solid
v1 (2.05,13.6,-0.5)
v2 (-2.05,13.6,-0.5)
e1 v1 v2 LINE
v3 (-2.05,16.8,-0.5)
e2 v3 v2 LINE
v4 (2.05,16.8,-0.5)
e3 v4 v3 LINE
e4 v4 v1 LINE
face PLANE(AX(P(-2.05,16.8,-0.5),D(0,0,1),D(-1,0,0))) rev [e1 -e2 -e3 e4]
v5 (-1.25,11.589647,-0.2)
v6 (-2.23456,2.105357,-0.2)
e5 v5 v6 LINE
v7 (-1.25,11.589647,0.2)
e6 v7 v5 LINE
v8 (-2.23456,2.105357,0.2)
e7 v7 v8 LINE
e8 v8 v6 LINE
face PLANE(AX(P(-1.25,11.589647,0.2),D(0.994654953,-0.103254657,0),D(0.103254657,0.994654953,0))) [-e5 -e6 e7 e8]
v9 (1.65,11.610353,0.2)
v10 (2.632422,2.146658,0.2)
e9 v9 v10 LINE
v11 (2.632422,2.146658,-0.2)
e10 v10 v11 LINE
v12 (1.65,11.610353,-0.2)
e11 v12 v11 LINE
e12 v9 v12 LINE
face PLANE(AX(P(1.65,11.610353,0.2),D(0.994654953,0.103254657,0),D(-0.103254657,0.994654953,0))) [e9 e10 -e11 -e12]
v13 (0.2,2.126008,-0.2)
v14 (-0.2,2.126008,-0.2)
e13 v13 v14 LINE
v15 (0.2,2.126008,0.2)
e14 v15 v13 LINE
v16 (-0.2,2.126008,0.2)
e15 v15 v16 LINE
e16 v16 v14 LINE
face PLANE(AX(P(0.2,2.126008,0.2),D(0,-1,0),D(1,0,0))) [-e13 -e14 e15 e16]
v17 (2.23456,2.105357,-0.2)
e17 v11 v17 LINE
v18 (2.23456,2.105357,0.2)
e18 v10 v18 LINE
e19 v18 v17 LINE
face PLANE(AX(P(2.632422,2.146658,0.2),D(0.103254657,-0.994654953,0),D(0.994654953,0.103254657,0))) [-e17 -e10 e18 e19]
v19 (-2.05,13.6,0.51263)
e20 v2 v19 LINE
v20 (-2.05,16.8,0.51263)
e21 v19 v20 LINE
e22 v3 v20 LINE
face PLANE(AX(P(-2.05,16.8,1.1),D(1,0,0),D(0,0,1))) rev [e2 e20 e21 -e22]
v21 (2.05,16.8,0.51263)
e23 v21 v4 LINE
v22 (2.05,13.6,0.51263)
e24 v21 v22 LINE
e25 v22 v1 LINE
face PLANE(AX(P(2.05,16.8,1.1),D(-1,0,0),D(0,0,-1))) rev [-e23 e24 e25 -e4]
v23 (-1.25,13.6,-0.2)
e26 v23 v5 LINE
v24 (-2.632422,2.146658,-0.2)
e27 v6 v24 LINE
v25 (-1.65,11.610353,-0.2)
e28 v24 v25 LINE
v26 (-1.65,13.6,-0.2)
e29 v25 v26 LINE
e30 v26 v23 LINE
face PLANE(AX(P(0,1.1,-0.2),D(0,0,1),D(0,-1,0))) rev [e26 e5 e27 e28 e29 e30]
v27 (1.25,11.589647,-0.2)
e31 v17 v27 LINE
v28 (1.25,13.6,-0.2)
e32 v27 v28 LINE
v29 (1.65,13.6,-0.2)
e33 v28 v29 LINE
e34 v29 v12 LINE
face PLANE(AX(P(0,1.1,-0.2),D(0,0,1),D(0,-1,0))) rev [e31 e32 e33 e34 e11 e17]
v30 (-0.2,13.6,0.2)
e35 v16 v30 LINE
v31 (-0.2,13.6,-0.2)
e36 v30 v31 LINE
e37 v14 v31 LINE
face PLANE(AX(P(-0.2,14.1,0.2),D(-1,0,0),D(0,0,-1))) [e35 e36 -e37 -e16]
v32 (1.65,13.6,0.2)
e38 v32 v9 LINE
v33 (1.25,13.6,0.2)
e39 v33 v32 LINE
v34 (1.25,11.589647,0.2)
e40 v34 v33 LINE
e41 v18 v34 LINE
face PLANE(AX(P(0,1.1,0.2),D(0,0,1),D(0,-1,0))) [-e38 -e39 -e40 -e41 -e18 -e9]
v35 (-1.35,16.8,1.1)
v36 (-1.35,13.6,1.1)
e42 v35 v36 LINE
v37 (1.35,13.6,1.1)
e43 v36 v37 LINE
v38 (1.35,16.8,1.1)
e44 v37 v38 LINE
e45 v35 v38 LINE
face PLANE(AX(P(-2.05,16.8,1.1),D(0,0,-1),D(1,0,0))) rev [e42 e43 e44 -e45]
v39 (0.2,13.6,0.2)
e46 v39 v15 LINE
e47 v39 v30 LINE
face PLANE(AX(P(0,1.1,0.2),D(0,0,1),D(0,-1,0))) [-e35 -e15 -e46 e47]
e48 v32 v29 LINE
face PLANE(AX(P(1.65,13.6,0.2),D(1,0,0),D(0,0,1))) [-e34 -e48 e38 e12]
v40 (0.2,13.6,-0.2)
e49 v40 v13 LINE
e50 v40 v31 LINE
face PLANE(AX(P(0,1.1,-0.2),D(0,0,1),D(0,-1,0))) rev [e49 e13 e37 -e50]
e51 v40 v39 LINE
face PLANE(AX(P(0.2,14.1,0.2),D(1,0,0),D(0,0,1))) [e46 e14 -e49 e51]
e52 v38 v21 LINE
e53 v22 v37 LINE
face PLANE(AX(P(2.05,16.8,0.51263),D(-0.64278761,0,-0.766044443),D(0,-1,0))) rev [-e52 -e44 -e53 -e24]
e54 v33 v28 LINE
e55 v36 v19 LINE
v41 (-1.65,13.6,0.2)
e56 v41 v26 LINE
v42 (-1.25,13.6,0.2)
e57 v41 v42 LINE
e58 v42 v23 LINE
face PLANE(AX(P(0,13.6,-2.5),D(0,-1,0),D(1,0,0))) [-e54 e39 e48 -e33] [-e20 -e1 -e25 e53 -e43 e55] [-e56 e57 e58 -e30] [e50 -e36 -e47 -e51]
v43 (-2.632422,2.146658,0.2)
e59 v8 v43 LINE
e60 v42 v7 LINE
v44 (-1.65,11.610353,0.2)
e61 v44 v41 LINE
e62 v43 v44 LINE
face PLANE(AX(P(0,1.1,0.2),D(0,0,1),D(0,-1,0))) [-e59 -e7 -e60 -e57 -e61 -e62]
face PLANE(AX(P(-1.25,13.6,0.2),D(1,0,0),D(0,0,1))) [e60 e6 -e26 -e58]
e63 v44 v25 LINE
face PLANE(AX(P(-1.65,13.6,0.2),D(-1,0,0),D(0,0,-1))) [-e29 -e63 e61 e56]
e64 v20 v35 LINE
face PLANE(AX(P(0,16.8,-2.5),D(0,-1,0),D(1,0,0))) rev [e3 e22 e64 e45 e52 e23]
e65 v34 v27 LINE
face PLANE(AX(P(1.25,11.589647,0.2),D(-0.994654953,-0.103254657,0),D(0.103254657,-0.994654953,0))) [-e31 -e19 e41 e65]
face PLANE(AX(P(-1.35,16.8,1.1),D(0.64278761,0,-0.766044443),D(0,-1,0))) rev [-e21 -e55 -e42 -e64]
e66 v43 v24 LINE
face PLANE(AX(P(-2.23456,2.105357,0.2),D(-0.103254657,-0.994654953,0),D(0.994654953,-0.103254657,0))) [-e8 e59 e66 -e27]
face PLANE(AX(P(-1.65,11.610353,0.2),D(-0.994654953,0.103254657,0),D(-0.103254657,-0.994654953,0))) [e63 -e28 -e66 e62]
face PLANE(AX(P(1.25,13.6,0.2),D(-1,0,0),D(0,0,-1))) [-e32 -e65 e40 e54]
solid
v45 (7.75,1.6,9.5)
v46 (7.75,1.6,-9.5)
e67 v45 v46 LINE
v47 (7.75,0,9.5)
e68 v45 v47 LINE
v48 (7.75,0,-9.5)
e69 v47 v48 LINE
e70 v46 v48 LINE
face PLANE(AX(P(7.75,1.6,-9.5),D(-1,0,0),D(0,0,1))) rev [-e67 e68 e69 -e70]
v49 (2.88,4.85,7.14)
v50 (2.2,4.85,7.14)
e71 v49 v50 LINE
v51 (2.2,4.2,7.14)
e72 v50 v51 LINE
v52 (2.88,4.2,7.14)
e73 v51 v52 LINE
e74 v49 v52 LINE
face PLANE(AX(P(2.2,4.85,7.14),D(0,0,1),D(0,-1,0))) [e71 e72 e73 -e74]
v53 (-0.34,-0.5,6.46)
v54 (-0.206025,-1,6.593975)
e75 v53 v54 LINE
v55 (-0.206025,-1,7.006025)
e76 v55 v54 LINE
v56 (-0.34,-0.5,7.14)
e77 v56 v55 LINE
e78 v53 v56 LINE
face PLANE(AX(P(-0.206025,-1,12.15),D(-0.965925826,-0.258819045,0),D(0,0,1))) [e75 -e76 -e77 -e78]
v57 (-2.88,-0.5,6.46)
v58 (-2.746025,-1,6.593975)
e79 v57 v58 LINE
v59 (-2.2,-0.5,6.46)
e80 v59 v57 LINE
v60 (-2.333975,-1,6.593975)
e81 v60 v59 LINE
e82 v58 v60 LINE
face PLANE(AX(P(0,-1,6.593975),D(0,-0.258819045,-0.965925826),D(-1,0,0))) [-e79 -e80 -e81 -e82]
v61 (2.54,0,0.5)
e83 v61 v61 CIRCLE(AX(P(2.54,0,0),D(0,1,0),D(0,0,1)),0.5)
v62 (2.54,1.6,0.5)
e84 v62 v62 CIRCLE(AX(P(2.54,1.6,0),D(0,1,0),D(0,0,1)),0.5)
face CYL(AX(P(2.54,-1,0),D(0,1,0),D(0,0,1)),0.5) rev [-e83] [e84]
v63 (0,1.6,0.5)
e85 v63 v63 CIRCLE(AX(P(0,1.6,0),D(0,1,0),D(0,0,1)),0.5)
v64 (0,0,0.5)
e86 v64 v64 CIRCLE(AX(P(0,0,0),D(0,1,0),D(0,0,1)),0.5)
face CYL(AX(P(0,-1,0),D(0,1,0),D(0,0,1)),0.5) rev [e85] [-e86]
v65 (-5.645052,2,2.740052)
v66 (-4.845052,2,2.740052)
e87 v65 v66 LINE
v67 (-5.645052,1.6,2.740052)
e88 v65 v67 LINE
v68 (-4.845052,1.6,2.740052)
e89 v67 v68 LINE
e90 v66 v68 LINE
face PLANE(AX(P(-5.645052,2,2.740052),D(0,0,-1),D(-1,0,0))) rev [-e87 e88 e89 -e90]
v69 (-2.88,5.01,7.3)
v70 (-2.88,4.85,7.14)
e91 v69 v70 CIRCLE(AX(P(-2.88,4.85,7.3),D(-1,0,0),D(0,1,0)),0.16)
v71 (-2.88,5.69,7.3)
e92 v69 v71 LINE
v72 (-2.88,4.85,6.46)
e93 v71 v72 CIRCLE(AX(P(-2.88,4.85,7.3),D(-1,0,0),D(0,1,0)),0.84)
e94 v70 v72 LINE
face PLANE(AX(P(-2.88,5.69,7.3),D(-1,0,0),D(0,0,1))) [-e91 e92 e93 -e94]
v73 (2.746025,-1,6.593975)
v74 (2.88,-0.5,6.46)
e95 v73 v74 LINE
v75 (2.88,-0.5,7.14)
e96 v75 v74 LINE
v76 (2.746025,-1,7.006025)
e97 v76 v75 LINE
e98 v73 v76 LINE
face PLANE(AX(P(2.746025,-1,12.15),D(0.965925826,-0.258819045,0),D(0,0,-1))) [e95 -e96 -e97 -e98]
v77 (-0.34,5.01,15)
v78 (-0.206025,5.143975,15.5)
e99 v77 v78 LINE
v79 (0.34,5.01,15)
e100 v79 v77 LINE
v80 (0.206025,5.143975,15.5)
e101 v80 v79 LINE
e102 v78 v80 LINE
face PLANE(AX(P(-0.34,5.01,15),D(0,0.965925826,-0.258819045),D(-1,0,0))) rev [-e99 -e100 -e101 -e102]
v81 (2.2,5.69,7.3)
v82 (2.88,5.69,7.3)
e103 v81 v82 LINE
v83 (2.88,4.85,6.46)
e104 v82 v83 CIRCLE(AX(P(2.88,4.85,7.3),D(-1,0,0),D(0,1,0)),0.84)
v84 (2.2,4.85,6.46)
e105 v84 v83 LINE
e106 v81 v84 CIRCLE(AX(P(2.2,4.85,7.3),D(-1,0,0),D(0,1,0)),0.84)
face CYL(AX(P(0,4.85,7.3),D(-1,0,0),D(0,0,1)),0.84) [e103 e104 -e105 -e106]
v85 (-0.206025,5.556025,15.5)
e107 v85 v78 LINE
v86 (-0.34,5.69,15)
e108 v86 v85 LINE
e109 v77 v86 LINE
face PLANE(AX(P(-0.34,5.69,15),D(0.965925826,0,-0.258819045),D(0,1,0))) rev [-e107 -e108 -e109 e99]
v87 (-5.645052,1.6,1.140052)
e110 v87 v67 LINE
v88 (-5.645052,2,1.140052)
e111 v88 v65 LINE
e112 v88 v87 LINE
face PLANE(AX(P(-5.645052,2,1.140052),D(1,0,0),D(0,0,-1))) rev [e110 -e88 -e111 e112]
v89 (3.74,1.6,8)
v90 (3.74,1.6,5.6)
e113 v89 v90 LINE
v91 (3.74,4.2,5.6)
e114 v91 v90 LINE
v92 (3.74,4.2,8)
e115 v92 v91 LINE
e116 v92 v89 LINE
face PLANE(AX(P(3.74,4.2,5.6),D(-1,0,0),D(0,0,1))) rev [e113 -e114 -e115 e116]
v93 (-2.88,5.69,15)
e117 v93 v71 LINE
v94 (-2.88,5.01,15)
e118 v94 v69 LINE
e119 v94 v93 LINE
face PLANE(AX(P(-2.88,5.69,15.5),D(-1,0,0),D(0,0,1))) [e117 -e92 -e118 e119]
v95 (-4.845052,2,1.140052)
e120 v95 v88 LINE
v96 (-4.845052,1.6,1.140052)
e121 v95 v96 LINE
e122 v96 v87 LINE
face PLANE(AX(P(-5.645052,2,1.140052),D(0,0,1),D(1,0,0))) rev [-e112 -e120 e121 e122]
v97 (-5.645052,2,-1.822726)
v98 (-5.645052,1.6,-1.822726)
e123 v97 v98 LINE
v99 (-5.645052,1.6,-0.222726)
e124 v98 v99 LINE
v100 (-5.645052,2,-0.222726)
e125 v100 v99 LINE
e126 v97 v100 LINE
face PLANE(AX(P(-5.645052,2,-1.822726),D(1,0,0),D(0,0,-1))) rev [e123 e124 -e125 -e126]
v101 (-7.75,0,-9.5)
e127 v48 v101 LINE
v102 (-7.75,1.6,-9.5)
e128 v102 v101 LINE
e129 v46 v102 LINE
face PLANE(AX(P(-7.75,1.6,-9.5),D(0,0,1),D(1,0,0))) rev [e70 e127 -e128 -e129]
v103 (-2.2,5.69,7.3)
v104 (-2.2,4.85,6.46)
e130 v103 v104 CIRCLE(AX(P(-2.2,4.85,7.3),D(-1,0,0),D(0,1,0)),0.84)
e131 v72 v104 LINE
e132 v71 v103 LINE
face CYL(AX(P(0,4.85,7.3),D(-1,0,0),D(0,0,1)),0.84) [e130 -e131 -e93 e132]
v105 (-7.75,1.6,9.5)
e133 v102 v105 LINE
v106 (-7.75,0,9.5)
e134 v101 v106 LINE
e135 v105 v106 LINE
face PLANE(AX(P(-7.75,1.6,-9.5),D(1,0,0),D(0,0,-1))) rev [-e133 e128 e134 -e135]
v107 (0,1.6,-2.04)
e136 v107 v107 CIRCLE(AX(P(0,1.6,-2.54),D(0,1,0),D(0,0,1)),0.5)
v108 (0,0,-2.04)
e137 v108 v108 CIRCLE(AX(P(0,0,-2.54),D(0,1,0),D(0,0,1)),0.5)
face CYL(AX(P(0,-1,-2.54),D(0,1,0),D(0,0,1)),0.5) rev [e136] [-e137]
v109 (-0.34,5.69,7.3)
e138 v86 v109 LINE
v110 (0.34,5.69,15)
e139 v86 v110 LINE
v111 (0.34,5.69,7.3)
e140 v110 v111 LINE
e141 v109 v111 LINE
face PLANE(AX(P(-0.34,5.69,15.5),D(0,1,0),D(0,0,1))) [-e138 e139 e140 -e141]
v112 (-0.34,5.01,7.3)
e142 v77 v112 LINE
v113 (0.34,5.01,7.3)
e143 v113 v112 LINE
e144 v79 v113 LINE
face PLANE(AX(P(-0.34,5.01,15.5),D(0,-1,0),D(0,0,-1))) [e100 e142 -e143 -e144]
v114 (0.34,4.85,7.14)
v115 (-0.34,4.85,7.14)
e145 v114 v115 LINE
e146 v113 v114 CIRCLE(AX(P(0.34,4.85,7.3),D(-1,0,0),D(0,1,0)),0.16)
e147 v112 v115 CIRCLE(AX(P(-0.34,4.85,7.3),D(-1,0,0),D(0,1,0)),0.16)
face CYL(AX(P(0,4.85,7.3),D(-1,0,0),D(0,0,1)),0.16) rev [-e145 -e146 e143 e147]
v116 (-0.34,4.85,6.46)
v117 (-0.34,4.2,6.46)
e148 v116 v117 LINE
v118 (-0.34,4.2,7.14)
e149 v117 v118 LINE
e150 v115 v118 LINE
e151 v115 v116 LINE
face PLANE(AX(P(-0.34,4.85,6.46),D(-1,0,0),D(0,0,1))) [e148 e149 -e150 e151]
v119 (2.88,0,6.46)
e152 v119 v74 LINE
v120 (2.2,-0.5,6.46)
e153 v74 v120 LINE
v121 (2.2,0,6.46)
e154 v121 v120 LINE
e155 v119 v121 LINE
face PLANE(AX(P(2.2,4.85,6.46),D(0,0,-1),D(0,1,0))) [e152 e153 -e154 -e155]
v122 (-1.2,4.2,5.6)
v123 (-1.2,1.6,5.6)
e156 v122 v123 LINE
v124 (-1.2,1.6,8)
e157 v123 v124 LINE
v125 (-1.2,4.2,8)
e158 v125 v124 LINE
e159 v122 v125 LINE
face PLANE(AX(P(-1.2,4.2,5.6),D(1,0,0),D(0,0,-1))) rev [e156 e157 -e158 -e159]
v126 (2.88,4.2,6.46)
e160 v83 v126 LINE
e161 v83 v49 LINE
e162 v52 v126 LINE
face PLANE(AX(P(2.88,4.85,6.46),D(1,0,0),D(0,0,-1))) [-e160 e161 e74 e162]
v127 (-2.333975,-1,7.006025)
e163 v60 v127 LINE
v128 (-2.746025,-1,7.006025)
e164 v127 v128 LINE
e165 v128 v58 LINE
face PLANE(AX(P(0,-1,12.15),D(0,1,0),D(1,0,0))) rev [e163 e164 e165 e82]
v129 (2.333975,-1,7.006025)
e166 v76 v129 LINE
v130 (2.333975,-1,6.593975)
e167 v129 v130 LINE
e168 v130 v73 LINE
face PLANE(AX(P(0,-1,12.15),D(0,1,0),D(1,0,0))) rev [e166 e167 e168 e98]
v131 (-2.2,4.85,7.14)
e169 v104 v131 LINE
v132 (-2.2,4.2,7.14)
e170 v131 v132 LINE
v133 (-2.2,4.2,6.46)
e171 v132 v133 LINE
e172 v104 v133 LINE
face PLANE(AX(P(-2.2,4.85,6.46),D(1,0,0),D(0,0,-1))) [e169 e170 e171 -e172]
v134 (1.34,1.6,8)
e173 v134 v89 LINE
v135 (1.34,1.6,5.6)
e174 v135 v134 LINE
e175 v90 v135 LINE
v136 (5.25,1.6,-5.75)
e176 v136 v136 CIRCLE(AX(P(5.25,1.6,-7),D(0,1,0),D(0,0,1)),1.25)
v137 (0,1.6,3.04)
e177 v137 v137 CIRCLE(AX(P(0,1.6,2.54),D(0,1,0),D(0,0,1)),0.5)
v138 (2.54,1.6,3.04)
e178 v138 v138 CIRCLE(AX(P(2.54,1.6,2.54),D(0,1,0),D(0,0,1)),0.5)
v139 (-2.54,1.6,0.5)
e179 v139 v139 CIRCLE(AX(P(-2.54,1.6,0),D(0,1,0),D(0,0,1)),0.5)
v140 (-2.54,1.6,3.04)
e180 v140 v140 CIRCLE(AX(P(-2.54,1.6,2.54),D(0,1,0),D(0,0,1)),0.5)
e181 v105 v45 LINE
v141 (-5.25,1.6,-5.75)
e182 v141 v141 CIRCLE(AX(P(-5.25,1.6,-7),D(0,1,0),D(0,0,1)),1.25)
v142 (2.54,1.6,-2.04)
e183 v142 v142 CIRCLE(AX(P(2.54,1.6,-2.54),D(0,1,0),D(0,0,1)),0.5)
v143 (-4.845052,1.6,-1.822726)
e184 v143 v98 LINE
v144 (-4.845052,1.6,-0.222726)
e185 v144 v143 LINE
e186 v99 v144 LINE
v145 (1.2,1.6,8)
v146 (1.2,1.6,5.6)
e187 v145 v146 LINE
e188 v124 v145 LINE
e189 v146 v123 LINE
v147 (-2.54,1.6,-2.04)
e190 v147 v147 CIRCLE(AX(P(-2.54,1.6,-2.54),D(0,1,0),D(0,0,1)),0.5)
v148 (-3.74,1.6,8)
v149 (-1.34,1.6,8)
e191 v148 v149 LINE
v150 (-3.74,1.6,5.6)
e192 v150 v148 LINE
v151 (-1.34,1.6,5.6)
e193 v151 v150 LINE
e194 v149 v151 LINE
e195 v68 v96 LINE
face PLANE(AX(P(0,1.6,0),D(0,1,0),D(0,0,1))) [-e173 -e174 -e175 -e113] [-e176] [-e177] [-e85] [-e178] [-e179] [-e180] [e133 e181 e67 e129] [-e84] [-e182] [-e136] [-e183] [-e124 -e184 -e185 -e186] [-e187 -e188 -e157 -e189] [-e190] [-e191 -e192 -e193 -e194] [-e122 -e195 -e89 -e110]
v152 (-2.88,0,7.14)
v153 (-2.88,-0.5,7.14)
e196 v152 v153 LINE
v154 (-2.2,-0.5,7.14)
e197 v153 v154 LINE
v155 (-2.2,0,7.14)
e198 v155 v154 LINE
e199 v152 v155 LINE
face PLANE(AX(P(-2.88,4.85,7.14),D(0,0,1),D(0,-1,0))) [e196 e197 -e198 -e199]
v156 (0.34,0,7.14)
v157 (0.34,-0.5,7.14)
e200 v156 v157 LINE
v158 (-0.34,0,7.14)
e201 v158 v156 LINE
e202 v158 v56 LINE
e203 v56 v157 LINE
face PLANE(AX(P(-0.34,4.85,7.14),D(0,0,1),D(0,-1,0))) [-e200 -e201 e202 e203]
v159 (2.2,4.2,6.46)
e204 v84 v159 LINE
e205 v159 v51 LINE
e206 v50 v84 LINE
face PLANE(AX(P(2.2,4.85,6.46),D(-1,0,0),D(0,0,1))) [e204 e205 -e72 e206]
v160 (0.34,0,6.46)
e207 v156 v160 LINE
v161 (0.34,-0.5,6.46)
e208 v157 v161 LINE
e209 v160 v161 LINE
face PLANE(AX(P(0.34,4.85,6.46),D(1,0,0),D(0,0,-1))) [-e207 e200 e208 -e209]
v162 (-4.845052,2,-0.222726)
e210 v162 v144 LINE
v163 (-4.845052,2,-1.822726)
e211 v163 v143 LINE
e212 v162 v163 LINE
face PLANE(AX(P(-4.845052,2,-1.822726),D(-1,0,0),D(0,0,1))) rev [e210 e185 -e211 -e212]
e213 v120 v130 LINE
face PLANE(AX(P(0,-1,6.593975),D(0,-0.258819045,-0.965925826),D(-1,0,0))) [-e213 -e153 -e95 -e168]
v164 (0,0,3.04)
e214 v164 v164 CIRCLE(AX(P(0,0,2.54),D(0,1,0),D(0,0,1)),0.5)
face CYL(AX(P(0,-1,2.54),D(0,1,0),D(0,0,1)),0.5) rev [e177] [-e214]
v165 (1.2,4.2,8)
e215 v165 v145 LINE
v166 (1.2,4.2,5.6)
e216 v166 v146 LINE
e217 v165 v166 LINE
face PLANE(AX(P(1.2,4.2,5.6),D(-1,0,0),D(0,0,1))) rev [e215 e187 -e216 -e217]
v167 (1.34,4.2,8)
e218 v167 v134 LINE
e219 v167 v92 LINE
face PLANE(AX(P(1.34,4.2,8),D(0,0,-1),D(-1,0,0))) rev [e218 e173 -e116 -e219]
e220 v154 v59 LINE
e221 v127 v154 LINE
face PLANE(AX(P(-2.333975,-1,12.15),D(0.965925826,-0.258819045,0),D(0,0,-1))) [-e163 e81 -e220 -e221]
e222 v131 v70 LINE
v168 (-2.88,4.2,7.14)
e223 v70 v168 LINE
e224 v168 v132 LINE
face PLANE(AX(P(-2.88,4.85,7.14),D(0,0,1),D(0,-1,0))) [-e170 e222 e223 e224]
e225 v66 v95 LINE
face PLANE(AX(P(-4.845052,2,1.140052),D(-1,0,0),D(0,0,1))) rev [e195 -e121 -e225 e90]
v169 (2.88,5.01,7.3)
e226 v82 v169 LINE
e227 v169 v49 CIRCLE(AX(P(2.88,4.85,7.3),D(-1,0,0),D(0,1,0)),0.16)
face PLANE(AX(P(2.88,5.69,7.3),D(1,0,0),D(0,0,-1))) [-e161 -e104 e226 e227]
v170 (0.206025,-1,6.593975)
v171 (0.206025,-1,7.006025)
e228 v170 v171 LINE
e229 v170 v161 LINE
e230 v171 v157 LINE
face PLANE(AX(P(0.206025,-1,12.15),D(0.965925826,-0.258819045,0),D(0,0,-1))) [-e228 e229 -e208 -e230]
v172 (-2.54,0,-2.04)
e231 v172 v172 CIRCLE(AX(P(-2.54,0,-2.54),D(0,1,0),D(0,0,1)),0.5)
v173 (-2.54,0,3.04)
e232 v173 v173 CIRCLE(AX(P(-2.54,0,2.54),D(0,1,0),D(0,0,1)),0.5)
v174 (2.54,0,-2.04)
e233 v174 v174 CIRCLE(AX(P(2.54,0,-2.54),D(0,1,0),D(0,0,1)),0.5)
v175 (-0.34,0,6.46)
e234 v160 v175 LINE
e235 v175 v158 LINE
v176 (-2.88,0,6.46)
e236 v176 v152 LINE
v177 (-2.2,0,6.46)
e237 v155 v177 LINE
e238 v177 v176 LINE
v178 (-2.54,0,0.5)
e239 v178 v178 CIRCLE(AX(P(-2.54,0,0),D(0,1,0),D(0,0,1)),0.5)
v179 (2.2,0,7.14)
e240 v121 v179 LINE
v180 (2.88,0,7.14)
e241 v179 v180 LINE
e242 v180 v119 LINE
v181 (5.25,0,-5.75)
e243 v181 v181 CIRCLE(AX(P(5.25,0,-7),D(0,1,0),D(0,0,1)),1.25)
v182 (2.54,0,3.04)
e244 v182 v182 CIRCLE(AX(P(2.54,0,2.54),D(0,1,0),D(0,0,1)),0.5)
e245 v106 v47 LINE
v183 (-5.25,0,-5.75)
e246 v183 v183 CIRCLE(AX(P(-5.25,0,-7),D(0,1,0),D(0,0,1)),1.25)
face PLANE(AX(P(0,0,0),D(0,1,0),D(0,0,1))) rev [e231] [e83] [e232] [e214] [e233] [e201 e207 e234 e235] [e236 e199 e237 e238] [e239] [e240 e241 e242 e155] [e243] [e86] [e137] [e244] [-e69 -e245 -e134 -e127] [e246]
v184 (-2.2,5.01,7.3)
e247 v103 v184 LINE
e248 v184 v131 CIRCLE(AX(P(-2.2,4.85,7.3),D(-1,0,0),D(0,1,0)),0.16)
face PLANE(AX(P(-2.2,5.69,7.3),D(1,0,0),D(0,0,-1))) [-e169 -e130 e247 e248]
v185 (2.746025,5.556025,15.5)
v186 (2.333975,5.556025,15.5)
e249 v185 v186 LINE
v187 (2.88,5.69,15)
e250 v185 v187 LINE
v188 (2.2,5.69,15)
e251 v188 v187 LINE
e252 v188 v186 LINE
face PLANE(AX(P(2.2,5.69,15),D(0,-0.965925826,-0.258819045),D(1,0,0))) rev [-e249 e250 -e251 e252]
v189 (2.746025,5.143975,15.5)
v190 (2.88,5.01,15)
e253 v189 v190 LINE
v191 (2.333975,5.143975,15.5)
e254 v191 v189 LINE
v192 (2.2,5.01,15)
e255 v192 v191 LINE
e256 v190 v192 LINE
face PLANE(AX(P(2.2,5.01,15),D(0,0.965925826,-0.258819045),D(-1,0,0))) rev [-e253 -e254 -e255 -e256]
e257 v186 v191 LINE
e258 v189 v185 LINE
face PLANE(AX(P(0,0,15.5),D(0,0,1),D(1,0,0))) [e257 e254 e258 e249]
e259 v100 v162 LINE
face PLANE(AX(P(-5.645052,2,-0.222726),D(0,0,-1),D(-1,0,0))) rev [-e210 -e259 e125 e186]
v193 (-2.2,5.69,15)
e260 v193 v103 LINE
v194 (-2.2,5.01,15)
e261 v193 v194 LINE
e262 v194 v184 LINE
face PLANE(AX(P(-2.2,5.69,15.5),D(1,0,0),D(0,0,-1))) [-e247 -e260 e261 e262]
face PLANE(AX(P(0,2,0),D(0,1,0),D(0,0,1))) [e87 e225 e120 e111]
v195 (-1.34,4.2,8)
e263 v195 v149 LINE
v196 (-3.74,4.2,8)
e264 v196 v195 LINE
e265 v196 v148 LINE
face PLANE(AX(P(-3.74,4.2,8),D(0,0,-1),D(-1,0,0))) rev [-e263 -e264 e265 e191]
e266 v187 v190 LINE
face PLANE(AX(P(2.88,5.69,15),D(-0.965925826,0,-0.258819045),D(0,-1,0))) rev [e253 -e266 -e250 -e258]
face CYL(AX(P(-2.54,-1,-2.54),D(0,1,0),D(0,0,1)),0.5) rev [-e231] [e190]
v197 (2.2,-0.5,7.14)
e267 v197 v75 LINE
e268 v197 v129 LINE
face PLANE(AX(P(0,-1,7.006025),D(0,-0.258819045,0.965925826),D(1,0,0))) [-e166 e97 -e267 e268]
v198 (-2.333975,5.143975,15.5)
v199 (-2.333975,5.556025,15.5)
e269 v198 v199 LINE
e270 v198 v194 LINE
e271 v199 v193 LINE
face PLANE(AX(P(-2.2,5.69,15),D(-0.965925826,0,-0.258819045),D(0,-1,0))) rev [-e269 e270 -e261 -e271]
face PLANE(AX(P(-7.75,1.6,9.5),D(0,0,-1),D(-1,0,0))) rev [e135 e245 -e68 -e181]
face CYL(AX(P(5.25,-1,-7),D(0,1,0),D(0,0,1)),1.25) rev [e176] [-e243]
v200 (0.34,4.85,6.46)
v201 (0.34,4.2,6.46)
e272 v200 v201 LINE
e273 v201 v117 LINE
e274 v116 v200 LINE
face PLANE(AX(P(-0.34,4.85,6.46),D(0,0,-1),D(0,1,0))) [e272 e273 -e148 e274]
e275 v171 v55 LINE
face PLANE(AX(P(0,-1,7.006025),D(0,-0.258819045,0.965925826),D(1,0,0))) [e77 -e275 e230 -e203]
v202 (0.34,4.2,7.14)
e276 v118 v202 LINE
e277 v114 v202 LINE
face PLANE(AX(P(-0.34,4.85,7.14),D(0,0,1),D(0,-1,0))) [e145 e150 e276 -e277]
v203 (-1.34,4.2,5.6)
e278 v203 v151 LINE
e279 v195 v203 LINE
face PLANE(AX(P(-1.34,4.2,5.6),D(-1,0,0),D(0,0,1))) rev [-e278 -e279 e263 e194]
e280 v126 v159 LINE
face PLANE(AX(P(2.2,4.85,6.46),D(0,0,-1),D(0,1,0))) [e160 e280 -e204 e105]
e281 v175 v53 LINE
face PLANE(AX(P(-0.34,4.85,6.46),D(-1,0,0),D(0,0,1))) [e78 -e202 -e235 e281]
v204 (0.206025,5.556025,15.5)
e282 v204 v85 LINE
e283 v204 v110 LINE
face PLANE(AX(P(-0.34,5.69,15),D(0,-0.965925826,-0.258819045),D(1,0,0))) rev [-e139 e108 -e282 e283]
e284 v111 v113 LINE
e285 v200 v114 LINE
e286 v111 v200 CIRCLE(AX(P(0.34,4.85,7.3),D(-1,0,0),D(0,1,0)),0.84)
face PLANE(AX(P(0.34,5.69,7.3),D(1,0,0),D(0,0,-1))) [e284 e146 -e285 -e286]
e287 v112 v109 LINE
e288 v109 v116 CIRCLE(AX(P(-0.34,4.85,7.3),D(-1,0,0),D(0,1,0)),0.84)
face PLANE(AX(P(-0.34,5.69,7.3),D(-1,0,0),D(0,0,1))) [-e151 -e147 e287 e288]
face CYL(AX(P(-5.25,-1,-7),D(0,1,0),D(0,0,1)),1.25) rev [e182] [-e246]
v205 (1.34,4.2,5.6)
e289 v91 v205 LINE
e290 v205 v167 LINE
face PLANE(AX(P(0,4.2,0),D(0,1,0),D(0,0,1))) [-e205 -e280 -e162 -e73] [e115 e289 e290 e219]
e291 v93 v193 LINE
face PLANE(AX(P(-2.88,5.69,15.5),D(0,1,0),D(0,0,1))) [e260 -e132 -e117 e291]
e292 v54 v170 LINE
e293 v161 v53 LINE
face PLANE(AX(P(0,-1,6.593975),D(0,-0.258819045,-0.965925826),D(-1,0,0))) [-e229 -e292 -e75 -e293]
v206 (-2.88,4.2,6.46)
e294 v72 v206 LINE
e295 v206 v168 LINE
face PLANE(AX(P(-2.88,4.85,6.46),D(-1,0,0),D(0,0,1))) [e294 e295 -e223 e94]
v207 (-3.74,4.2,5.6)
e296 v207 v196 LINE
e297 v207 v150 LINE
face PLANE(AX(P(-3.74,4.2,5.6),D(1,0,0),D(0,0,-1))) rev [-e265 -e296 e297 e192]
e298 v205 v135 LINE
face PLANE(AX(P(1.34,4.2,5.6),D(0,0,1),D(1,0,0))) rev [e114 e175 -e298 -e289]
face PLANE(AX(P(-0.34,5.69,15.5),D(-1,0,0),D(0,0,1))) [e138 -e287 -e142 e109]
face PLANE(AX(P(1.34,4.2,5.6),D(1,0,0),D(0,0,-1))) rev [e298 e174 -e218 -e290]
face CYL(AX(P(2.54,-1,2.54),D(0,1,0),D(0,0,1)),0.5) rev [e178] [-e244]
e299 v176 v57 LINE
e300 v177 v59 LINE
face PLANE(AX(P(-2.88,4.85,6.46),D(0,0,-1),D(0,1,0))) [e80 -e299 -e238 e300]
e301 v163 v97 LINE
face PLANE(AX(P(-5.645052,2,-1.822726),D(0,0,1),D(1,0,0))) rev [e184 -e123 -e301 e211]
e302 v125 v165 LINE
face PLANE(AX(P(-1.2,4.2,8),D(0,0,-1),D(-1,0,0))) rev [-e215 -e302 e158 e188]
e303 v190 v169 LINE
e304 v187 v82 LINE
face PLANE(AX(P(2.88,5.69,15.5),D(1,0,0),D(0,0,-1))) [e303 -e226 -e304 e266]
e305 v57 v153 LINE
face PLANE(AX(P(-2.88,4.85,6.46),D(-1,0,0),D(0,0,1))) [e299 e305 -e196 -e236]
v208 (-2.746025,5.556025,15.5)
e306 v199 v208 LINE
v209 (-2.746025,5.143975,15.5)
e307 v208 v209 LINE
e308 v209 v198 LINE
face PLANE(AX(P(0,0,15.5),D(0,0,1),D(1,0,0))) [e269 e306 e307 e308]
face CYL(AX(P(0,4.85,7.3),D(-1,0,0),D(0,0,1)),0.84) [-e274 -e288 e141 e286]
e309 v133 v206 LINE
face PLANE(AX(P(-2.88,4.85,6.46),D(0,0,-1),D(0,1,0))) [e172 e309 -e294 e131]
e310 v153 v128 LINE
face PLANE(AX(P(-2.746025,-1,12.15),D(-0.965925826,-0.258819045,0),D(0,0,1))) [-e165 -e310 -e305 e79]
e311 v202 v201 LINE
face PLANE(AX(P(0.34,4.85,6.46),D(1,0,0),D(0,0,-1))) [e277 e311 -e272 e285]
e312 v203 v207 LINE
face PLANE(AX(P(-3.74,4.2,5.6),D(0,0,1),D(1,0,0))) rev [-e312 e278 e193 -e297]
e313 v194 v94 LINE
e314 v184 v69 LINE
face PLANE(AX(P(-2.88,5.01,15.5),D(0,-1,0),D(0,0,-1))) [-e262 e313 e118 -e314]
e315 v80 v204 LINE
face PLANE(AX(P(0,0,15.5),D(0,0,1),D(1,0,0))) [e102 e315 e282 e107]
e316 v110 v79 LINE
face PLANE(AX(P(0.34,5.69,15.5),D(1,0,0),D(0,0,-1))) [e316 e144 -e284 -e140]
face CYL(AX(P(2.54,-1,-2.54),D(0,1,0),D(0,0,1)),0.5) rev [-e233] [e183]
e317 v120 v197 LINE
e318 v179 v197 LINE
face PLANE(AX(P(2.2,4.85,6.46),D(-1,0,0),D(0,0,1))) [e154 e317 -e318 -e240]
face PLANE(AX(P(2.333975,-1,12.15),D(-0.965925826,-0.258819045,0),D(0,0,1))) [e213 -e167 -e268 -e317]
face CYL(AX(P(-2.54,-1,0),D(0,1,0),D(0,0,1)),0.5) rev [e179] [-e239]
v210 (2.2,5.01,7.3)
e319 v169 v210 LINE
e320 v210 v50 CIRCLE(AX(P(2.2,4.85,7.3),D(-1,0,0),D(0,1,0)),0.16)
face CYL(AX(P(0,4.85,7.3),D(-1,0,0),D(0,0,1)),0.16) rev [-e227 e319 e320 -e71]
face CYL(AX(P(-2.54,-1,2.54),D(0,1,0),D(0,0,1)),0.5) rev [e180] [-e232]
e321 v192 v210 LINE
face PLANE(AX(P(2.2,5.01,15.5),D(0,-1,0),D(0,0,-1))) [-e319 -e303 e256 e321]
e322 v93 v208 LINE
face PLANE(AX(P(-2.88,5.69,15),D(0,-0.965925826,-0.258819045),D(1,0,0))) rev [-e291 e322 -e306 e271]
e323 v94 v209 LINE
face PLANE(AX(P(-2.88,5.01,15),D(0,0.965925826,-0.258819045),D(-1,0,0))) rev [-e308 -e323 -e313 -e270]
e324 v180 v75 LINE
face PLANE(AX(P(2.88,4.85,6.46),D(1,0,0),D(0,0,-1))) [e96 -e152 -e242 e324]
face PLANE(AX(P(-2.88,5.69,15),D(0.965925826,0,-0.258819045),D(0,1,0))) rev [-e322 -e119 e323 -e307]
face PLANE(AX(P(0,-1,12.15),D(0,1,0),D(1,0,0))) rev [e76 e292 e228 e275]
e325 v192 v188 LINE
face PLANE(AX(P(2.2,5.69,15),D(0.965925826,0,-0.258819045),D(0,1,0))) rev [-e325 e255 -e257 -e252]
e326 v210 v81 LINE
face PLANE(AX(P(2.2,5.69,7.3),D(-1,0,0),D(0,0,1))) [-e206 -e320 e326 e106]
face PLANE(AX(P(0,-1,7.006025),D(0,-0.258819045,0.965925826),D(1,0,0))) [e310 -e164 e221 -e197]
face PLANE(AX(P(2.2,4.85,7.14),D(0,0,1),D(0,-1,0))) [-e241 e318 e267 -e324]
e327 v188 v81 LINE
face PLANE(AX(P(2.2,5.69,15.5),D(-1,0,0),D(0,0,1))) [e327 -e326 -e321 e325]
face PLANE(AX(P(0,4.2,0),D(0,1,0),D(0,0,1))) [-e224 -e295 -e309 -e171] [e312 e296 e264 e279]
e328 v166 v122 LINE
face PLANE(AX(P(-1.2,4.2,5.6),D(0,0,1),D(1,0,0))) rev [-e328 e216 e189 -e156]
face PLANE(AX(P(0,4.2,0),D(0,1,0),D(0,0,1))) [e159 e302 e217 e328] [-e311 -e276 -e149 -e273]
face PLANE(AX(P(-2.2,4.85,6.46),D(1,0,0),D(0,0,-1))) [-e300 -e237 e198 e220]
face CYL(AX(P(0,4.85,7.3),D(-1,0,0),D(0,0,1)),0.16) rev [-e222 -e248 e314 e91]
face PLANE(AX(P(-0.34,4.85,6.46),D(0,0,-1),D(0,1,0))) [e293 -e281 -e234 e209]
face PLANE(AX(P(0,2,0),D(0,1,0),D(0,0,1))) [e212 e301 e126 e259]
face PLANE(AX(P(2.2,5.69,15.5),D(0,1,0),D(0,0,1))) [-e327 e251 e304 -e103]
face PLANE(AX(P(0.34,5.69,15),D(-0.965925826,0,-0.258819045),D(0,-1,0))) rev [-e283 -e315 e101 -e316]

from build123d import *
from OCP.BRepFilletAPI import BRepFilletAPI_MakeChamfer

# Parameters (mm, degrees)
SKETCH1_W             = 15.5
SKETCH1_H             = 19
BOSS_EXTRUDE1_DEPTH   = 1.6
SKETCH2_W             = 2.4
SKETCH2_H             = 2.4
BOSS_EXTRUDE2_DEPTH   = 2.6
SKETCH4_W             = 0.68
SKETCH4_H             = 0.68
SKETCH8_R             = 0.5
CUT_EXTRUDE2_DEPTH    = 18.80563394
CHAMFER1_SIZE         = 0.5
CHAMFER1_SIZE2        = 0.133974596
SKETCH5_R             = 1.25
CUT_EXTRUDE1_DEPTH    = 18.80563394
SKETCH6_W             = 4.1
SKETCH6_H             = 1.6
BOSS_EXTRUDE3_DEPTH   = 3.2
CHAMFER2_SIZE         = 0.7
CHAMFER2_SIZE2        = 0.587369742
BOSS_EXTRUDE4_START   = -0.3
SKETCH7_W             = 0.4
SKETCH7_H             = 11.973992441
BOSS_EXTRUDE4_DEPTH   = 0.4
SKETCH13_W            = 0.8
SKETCH13_H            = 1.6
BOSS_EXTRUDE5_DEPTH   = 0.4
BODY_MOVE_COPY1_ANGLE = 90


with BuildPart() as part:
    # Sketch1 → Boss-Extrude1 (new body)
    with BuildSketch(Plane(origin=(0, 0, 0), x_dir=(1, 0, 0), z_dir=(0, 1, 0))):
        Rectangle(SKETCH1_W, SKETCH1_H)
    extrude(amount=BOSS_EXTRUDE1_DEPTH)

    # Sketch2 → Boss-Extrude2 (add)
    with BuildSketch(Plane(origin=(0, 1.6, 0), x_dir=(1, 0, 0), z_dir=(0, 1, 0))):
        with Locations((0, -6.8)):
            Rectangle(SKETCH2_W, SKETCH2_H)
        with Locations((-2.54, -6.8)):
            Rectangle(SKETCH2_W, SKETCH2_H)
        with Locations((2.54, -6.8)):
            Rectangle(SKETCH2_W, SKETCH2_H)
    extrude(amount=BOSS_EXTRUDE2_DEPTH)

    # Sweep1: sweep along a path in Sketch3
    with BuildLine(Plane(origin=(0, 0, 0), x_dir=(0, 0, -1), z_dir=(1, 0, 0))) as sweep1_path:
        Line((-15.5, 5.35), (-7.3, 5.35))
        ThreePointArc((-7.3, 5.35), (-6.946446609, 5.203553391), (-6.8, 4.85))
        Line((-6.8, 4.85), (-6.8, -1))
    # Sketch4 → Sweep1 (sweep)
    with BuildSketch(Plane(origin=(0, 0, 15.5), x_dir=(-1, 0, 0), z_dir=(0, 0, -1))):
        with Locations((0, 5.35)):
            Rectangle(SKETCH4_W, SKETCH4_H)
        with Locations((2.54, 5.35)):
            Rectangle(SKETCH4_W, SKETCH4_H)
        with Locations((-2.54, 5.35)):
            Rectangle(SKETCH4_W, SKETCH4_H)
    sweep(path=sweep1_path.line)

    # Sketch8 → Cut-Extrude2 (cut, through all)
    with BuildSketch(Plane(origin=(0, 1.6, 0), x_dir=(1, 0, 0), z_dir=(0, 1, 0))):
        with Locations(Location((-2.54, 2.54, 0), (0, 0, 270))):
            Circle(SKETCH8_R)
        with Locations(Location((0, 2.54, 0), (0, 0, 270))):
            Circle(SKETCH8_R)
        with Locations(Location((2.54, 2.54, 0), (0, 0, 270))):
            Circle(SKETCH8_R)
        with Locations(Location((0, 0, 0), (0, 0, 270))):
            Circle(SKETCH8_R)
        with Locations(Location((2.54, 0, 0), (0, 0, 270))):
            Circle(SKETCH8_R)
        with Locations(Location((0, -2.54, 0), (0, 0, 270))):
            Circle(SKETCH8_R)
        with Locations(Location((2.54, -2.54, 0), (0, 0, 270))):
            Circle(SKETCH8_R)
        with Locations(Location((-2.54, 0, 0), (0, 0, 270))):
            Circle(SKETCH8_R)
        with Locations(Location((-2.54, -2.54, 0), (0, 0, 270))):
            Circle(SKETCH8_R)
    extrude(amount=-CUT_EXTRUDE2_DEPTH, mode=Mode.SUBTRACT)

    # Chamfer1: one chamfer whose edges measure the first distance from different faces: ONE call of the kernel's chamfer builder (chamfer() names one face for all edges)
    chamfer1_edges_1 = [part.edges().sort_by_distance(p)[0] for p in [
        (2.2, -1, 6.8),
    ]]
    chamfer1_side_1 = [part.faces().sort_by_distance(p)[0] for p in [
        (2.2, -0.5, 6.8),
    ]]
    chamfer1_edges_2 = [part.edges().sort_by_distance(p)[0] for p in [
        (2.54, -1, 6.46),
    ]]
    chamfer1_side_2 = [part.faces().sort_by_distance(p)[0] for p in [
        (2.54, -0.5, 6.46),
    ]]
    chamfer1_edges_3 = [part.edges().sort_by_distance(p)[0] for p in [
        (2.88, -1, 6.8),
    ]]
    chamfer1_side_3 = [part.faces().sort_by_distance(p)[0] for p in [
        (2.88, -0.5, 6.8),
    ]]
    chamfer1_edges_4 = [part.edges().sort_by_distance(p)[0] for p in [
        (2.54, -1, 7.14),
    ]]
    chamfer1_side_4 = [part.faces().sort_by_distance(p)[0] for p in [
        (2.54, -0.5, 7.14),
    ]]
    chamfer1_edges_5 = [part.edges().sort_by_distance(p)[0] for p in [
        (2.88, 5.35, 15.5),
    ]]
    chamfer1_side_5 = [part.faces().sort_by_distance(p)[0] for p in [
        (2.88, 5.283535103, 10.725542578),
    ]]
    chamfer1_edges_6 = [part.edges().sort_by_distance(p)[0] for p in [
        (2.54, 5.01, 15.5),
    ]]
    chamfer1_side_6 = [part.faces().sort_by_distance(p)[0] for p in [
        (2.54, 5.01, 11.4),
    ]]
    chamfer1_edges_7 = [part.edges().sort_by_distance(p)[0] for p in [
        (2.2, 5.35, 15.5),
    ]]
    chamfer1_side_7 = [part.faces().sort_by_distance(p)[0] for p in [
        (2.2, 5.283535103, 10.725542578),
    ]]
    chamfer1_edges_8 = [part.edges().sort_by_distance(p)[0] for p in [
        (2.54, 5.69, 15.5),
    ]]
    chamfer1_side_8 = [part.faces().sort_by_distance(p)[0] for p in [
        (2.54, 5.69, 11.4),
    ]]
    chamfer1_edges_9 = [part.edges().sort_by_distance(p)[0] for p in [
        (-2.88, -1, 6.8),
    ]]
    chamfer1_side_9 = [part.faces().sort_by_distance(p)[0] for p in [
        (-2.88, -0.5, 6.8),
    ]]
    chamfer1_edges_10 = [part.edges().sort_by_distance(p)[0] for p in [
        (-2.54, -1, 6.46),
    ]]
    chamfer1_side_10 = [part.faces().sort_by_distance(p)[0] for p in [
        (-2.54, -0.5, 6.46),
    ]]
    chamfer1_edges_11 = [part.edges().sort_by_distance(p)[0] for p in [
        (-2.2, -1, 6.8),
    ]]
    chamfer1_side_11 = [part.faces().sort_by_distance(p)[0] for p in [
        (-2.2, -0.5, 6.8),
    ]]
    chamfer1_edges_12 = [part.edges().sort_by_distance(p)[0] for p in [
        (-2.54, -1, 7.14),
    ]]
    chamfer1_side_12 = [part.faces().sort_by_distance(p)[0] for p in [
        (-2.54, -0.5, 7.14),
    ]]
    chamfer1_edges_13 = [part.edges().sort_by_distance(p)[0] for p in [
        (-2.2, 5.35, 15.5),
    ]]
    chamfer1_side_13 = [part.faces().sort_by_distance(p)[0] for p in [
        (-2.2, 5.283535103, 10.725542578),
    ]]
    chamfer1_edges_14 = [part.edges().sort_by_distance(p)[0] for p in [
        (-2.54, 5.01, 15.5),
    ]]
    chamfer1_side_14 = [part.faces().sort_by_distance(p)[0] for p in [
        (-2.54, 5.01, 11.4),
    ]]
    chamfer1_edges_15 = [part.edges().sort_by_distance(p)[0] for p in [
        (-2.88, 5.35, 15.5),
    ]]
    chamfer1_side_15 = [part.faces().sort_by_distance(p)[0] for p in [
        (-2.88, 5.283535103, 10.725542578),
    ]]
    chamfer1_edges_16 = [part.edges().sort_by_distance(p)[0] for p in [
        (-2.54, 5.69, 15.5),
    ]]
    chamfer1_side_16 = [part.faces().sort_by_distance(p)[0] for p in [
        (-2.54, 5.69, 11.4),
    ]]
    chamfer1_edges_17 = [part.edges().sort_by_distance(p)[0] for p in [
        (-0.34, -1, 6.8),
    ]]
    chamfer1_side_17 = [part.faces().sort_by_distance(p)[0] for p in [
        (-0.34, -0.5, 6.8),
    ]]
    chamfer1_edges_18 = [part.edges().sort_by_distance(p)[0] for p in [
        (0, -1, 6.46),
    ]]
    chamfer1_side_18 = [part.faces().sort_by_distance(p)[0] for p in [
        (0, -0.5, 6.46),
    ]]
    chamfer1_edges_19 = [part.edges().sort_by_distance(p)[0] for p in [
        (0.34, -1, 6.8),
    ]]
    chamfer1_side_19 = [part.faces().sort_by_distance(p)[0] for p in [
        (0.34, -0.5, 6.8),
    ]]
    chamfer1_edges_20 = [part.edges().sort_by_distance(p)[0] for p in [
        (0, -1, 7.14),
    ]]
    chamfer1_side_20 = [part.faces().sort_by_distance(p)[0] for p in [
        (0, -0.5, 7.14),
    ]]
    chamfer1_edges_21 = [part.edges().sort_by_distance(p)[0] for p in [
        (0.34, 5.35, 15.5),
    ]]
    chamfer1_side_21 = [part.faces().sort_by_distance(p)[0] for p in [
        (0.34, 5.283535103, 10.725542578),
    ]]
    chamfer1_edges_22 = [part.edges().sort_by_distance(p)[0] for p in [
        (0, 5.01, 15.5),
    ]]
    chamfer1_side_22 = [part.faces().sort_by_distance(p)[0] for p in [
        (0, 5.01, 11.4),
    ]]
    chamfer1_edges_23 = [part.edges().sort_by_distance(p)[0] for p in [
        (-0.34, 5.35, 15.5),
    ]]
    chamfer1_side_23 = [part.faces().sort_by_distance(p)[0] for p in [
        (-0.34, 5.283535103, 10.725542578),
    ]]
    chamfer1_edges_24 = [part.edges().sort_by_distance(p)[0] for p in [
        (0, 5.69, 15.5),
    ]]
    chamfer1_side_24 = [part.faces().sort_by_distance(p)[0] for p in [
        (0, 5.69, 11.4),
    ]]
    chamfer1 = BRepFilletAPI_MakeChamfer(part.part.solid().wrapped)
    for e in chamfer1_edges_1:
        chamfer1.Add(CHAMFER1_SIZE, CHAMFER1_SIZE2, e.wrapped, chamfer1_side_1[0].wrapped)  # the first distance lies on this face
    for e in chamfer1_edges_2:
        chamfer1.Add(CHAMFER1_SIZE, CHAMFER1_SIZE2, e.wrapped, chamfer1_side_2[0].wrapped)  # the first distance lies on this face
    for e in chamfer1_edges_3:
        chamfer1.Add(CHAMFER1_SIZE, CHAMFER1_SIZE2, e.wrapped, chamfer1_side_3[0].wrapped)  # the first distance lies on this face
    for e in chamfer1_edges_4:
        chamfer1.Add(CHAMFER1_SIZE, CHAMFER1_SIZE2, e.wrapped, chamfer1_side_4[0].wrapped)  # the first distance lies on this face
    for e in chamfer1_edges_5:
        chamfer1.Add(CHAMFER1_SIZE, CHAMFER1_SIZE2, e.wrapped, chamfer1_side_5[0].wrapped)  # the first distance lies on this face
    for e in chamfer1_edges_6:
        chamfer1.Add(CHAMFER1_SIZE, CHAMFER1_SIZE2, e.wrapped, chamfer1_side_6[0].wrapped)  # the first distance lies on this face
    for e in chamfer1_edges_7:
        chamfer1.Add(CHAMFER1_SIZE, CHAMFER1_SIZE2, e.wrapped, chamfer1_side_7[0].wrapped)  # the first distance lies on this face
    for e in chamfer1_edges_8:
        chamfer1.Add(CHAMFER1_SIZE, CHAMFER1_SIZE2, e.wrapped, chamfer1_side_8[0].wrapped)  # the first distance lies on this face
    for e in chamfer1_edges_9:
        chamfer1.Add(CHAMFER1_SIZE, CHAMFER1_SIZE2, e.wrapped, chamfer1_side_9[0].wrapped)  # the first distance lies on this face
    for e in chamfer1_edges_10:
        chamfer1.Add(CHAMFER1_SIZE, CHAMFER1_SIZE2, e.wrapped, chamfer1_side_10[0].wrapped)  # the first distance lies on this face
    for e in chamfer1_edges_11:
        chamfer1.Add(CHAMFER1_SIZE, CHAMFER1_SIZE2, e.wrapped, chamfer1_side_11[0].wrapped)  # the first distance lies on this face
    for e in chamfer1_edges_12:
        chamfer1.Add(CHAMFER1_SIZE, CHAMFER1_SIZE2, e.wrapped, chamfer1_side_12[0].wrapped)  # the first distance lies on this face
    for e in chamfer1_edges_13:
        chamfer1.Add(CHAMFER1_SIZE, CHAMFER1_SIZE2, e.wrapped, chamfer1_side_13[0].wrapped)  # the first distance lies on this face
    for e in chamfer1_edges_14:
        chamfer1.Add(CHAMFER1_SIZE, CHAMFER1_SIZE2, e.wrapped, chamfer1_side_14[0].wrapped)  # the first distance lies on this face
    for e in chamfer1_edges_15:
        chamfer1.Add(CHAMFER1_SIZE, CHAMFER1_SIZE2, e.wrapped, chamfer1_side_15[0].wrapped)  # the first distance lies on this face
    for e in chamfer1_edges_16:
        chamfer1.Add(CHAMFER1_SIZE, CHAMFER1_SIZE2, e.wrapped, chamfer1_side_16[0].wrapped)  # the first distance lies on this face
    for e in chamfer1_edges_17:
        chamfer1.Add(CHAMFER1_SIZE, CHAMFER1_SIZE2, e.wrapped, chamfer1_side_17[0].wrapped)  # the first distance lies on this face
    for e in chamfer1_edges_18:
        chamfer1.Add(CHAMFER1_SIZE, CHAMFER1_SIZE2, e.wrapped, chamfer1_side_18[0].wrapped)  # the first distance lies on this face
    for e in chamfer1_edges_19:
        chamfer1.Add(CHAMFER1_SIZE, CHAMFER1_SIZE2, e.wrapped, chamfer1_side_19[0].wrapped)  # the first distance lies on this face
    for e in chamfer1_edges_20:
        chamfer1.Add(CHAMFER1_SIZE, CHAMFER1_SIZE2, e.wrapped, chamfer1_side_20[0].wrapped)  # the first distance lies on this face
    for e in chamfer1_edges_21:
        chamfer1.Add(CHAMFER1_SIZE, CHAMFER1_SIZE2, e.wrapped, chamfer1_side_21[0].wrapped)  # the first distance lies on this face
    for e in chamfer1_edges_22:
        chamfer1.Add(CHAMFER1_SIZE, CHAMFER1_SIZE2, e.wrapped, chamfer1_side_22[0].wrapped)  # the first distance lies on this face
    for e in chamfer1_edges_23:
        chamfer1.Add(CHAMFER1_SIZE, CHAMFER1_SIZE2, e.wrapped, chamfer1_side_23[0].wrapped)  # the first distance lies on this face
    for e in chamfer1_edges_24:
        chamfer1.Add(CHAMFER1_SIZE, CHAMFER1_SIZE2, e.wrapped, chamfer1_side_24[0].wrapped)  # the first distance lies on this face
    add(Compound.cast(chamfer1.Shape()), mode=Mode.REPLACE)

    # Sketch5 → Cut-Extrude1 (cut, through all)
    with BuildSketch(Plane(origin=(0, 1.6, 0), x_dir=(1, 0, 0), z_dir=(0, 1, 0))):
        with Locations(Location((-5.25, 7, 0), (0, 0, 270))):
            Circle(SKETCH5_R)
        with Locations(Location((5.25, 7, 0), (0, 0, 270))):
            Circle(SKETCH5_R)
    extrude(amount=-CUT_EXTRUDE1_DEPTH, mode=Mode.SUBTRACT)

    # Sketch13 → Boss-Extrude5 (add)
    with BuildSketch(Plane(origin=(0, 1.6, 0), x_dir=(1, 0, 0), z_dir=(0, 1, 0))):
        with Locations((-5.245052358, 1.022726005)):
            Rectangle(SKETCH13_W, SKETCH13_H)
        with Locations((-5.245052358, -1.940051544)):
            Rectangle(SKETCH13_W, SKETCH13_H)
    extrude(amount=BOSS_EXTRUDE5_DEPTH)


with BuildPart() as body_2:
    # Sketch6 → Boss-Extrude3 (new body)
    with BuildSketch(Plane(origin=(0, 0, -12.5), x_dir=(-1, 0, 0), z_dir=(0, 0, -1))):
        with Locations((0, 2.8)):
            Rectangle(SKETCH6_W, SKETCH6_H)
    extrude(amount=BOSS_EXTRUDE3_DEPTH)

    # Chamfer2
    chamfer2_edges = [body_2.edges().sort_by_distance(p)[0] for p in [
        (2.05, 3.6, -14.1),
        (-2.05, 3.6, -14.1),
    ]]
    chamfer2_side = [body_2.faces().sort_by_distance(p)[0] for p in [
        (0, 3.6, -14.1),
    ]]
    chamfer(chamfer2_edges, length=CHAMFER2_SIZE, length2=CHAMFER2_SIZE2, reference=chamfer2_side[0])

    # Sketch7 → Boss-Extrude4 (add)
    with BuildSketch(Plane.XZ.offset(-2).offset(BOSS_EXTRUDE4_START)):
        Polygon((1.65, -12.5), (1.65, -10.510353135), (2.632421634, -1.046658491), (2.234559653, -1.005356628), (1.25, -10.489646865), (1.25, -12.5), align=None)
        with Locations((0, -7.013003779)):
            Rectangle(SKETCH7_W, SKETCH7_H)
        Polygon((-1.25, -12.5), (-1.25, -10.489646865), (-2.234559653, -1.005356628), (-2.632421634, -1.046658491), (-1.65, -10.510353135), (-1.65, -12.5), align=None)
    extrude(amount=-BOSS_EXTRUDE4_DEPTH)


with BuildPart() as body_2_1:
    # Body-Move/Copy1: read off the stored shape, not the designer's step
    # Body-Move/Copy1: moved
    add(body_2.part.moved(Location((0, -0.5, -1.1))).rotate(Axis((0, 0, 0), (1, 0, 0)), BODY_MOVE_COPY1_ANGLE))


with BuildPart() as body_2_2:
    # Body-Move/Copy2: moved
    add(body_2_1.part.moved(Location((0, 0, -2))))


solid = Compound([part.part, body_2_2.part])
